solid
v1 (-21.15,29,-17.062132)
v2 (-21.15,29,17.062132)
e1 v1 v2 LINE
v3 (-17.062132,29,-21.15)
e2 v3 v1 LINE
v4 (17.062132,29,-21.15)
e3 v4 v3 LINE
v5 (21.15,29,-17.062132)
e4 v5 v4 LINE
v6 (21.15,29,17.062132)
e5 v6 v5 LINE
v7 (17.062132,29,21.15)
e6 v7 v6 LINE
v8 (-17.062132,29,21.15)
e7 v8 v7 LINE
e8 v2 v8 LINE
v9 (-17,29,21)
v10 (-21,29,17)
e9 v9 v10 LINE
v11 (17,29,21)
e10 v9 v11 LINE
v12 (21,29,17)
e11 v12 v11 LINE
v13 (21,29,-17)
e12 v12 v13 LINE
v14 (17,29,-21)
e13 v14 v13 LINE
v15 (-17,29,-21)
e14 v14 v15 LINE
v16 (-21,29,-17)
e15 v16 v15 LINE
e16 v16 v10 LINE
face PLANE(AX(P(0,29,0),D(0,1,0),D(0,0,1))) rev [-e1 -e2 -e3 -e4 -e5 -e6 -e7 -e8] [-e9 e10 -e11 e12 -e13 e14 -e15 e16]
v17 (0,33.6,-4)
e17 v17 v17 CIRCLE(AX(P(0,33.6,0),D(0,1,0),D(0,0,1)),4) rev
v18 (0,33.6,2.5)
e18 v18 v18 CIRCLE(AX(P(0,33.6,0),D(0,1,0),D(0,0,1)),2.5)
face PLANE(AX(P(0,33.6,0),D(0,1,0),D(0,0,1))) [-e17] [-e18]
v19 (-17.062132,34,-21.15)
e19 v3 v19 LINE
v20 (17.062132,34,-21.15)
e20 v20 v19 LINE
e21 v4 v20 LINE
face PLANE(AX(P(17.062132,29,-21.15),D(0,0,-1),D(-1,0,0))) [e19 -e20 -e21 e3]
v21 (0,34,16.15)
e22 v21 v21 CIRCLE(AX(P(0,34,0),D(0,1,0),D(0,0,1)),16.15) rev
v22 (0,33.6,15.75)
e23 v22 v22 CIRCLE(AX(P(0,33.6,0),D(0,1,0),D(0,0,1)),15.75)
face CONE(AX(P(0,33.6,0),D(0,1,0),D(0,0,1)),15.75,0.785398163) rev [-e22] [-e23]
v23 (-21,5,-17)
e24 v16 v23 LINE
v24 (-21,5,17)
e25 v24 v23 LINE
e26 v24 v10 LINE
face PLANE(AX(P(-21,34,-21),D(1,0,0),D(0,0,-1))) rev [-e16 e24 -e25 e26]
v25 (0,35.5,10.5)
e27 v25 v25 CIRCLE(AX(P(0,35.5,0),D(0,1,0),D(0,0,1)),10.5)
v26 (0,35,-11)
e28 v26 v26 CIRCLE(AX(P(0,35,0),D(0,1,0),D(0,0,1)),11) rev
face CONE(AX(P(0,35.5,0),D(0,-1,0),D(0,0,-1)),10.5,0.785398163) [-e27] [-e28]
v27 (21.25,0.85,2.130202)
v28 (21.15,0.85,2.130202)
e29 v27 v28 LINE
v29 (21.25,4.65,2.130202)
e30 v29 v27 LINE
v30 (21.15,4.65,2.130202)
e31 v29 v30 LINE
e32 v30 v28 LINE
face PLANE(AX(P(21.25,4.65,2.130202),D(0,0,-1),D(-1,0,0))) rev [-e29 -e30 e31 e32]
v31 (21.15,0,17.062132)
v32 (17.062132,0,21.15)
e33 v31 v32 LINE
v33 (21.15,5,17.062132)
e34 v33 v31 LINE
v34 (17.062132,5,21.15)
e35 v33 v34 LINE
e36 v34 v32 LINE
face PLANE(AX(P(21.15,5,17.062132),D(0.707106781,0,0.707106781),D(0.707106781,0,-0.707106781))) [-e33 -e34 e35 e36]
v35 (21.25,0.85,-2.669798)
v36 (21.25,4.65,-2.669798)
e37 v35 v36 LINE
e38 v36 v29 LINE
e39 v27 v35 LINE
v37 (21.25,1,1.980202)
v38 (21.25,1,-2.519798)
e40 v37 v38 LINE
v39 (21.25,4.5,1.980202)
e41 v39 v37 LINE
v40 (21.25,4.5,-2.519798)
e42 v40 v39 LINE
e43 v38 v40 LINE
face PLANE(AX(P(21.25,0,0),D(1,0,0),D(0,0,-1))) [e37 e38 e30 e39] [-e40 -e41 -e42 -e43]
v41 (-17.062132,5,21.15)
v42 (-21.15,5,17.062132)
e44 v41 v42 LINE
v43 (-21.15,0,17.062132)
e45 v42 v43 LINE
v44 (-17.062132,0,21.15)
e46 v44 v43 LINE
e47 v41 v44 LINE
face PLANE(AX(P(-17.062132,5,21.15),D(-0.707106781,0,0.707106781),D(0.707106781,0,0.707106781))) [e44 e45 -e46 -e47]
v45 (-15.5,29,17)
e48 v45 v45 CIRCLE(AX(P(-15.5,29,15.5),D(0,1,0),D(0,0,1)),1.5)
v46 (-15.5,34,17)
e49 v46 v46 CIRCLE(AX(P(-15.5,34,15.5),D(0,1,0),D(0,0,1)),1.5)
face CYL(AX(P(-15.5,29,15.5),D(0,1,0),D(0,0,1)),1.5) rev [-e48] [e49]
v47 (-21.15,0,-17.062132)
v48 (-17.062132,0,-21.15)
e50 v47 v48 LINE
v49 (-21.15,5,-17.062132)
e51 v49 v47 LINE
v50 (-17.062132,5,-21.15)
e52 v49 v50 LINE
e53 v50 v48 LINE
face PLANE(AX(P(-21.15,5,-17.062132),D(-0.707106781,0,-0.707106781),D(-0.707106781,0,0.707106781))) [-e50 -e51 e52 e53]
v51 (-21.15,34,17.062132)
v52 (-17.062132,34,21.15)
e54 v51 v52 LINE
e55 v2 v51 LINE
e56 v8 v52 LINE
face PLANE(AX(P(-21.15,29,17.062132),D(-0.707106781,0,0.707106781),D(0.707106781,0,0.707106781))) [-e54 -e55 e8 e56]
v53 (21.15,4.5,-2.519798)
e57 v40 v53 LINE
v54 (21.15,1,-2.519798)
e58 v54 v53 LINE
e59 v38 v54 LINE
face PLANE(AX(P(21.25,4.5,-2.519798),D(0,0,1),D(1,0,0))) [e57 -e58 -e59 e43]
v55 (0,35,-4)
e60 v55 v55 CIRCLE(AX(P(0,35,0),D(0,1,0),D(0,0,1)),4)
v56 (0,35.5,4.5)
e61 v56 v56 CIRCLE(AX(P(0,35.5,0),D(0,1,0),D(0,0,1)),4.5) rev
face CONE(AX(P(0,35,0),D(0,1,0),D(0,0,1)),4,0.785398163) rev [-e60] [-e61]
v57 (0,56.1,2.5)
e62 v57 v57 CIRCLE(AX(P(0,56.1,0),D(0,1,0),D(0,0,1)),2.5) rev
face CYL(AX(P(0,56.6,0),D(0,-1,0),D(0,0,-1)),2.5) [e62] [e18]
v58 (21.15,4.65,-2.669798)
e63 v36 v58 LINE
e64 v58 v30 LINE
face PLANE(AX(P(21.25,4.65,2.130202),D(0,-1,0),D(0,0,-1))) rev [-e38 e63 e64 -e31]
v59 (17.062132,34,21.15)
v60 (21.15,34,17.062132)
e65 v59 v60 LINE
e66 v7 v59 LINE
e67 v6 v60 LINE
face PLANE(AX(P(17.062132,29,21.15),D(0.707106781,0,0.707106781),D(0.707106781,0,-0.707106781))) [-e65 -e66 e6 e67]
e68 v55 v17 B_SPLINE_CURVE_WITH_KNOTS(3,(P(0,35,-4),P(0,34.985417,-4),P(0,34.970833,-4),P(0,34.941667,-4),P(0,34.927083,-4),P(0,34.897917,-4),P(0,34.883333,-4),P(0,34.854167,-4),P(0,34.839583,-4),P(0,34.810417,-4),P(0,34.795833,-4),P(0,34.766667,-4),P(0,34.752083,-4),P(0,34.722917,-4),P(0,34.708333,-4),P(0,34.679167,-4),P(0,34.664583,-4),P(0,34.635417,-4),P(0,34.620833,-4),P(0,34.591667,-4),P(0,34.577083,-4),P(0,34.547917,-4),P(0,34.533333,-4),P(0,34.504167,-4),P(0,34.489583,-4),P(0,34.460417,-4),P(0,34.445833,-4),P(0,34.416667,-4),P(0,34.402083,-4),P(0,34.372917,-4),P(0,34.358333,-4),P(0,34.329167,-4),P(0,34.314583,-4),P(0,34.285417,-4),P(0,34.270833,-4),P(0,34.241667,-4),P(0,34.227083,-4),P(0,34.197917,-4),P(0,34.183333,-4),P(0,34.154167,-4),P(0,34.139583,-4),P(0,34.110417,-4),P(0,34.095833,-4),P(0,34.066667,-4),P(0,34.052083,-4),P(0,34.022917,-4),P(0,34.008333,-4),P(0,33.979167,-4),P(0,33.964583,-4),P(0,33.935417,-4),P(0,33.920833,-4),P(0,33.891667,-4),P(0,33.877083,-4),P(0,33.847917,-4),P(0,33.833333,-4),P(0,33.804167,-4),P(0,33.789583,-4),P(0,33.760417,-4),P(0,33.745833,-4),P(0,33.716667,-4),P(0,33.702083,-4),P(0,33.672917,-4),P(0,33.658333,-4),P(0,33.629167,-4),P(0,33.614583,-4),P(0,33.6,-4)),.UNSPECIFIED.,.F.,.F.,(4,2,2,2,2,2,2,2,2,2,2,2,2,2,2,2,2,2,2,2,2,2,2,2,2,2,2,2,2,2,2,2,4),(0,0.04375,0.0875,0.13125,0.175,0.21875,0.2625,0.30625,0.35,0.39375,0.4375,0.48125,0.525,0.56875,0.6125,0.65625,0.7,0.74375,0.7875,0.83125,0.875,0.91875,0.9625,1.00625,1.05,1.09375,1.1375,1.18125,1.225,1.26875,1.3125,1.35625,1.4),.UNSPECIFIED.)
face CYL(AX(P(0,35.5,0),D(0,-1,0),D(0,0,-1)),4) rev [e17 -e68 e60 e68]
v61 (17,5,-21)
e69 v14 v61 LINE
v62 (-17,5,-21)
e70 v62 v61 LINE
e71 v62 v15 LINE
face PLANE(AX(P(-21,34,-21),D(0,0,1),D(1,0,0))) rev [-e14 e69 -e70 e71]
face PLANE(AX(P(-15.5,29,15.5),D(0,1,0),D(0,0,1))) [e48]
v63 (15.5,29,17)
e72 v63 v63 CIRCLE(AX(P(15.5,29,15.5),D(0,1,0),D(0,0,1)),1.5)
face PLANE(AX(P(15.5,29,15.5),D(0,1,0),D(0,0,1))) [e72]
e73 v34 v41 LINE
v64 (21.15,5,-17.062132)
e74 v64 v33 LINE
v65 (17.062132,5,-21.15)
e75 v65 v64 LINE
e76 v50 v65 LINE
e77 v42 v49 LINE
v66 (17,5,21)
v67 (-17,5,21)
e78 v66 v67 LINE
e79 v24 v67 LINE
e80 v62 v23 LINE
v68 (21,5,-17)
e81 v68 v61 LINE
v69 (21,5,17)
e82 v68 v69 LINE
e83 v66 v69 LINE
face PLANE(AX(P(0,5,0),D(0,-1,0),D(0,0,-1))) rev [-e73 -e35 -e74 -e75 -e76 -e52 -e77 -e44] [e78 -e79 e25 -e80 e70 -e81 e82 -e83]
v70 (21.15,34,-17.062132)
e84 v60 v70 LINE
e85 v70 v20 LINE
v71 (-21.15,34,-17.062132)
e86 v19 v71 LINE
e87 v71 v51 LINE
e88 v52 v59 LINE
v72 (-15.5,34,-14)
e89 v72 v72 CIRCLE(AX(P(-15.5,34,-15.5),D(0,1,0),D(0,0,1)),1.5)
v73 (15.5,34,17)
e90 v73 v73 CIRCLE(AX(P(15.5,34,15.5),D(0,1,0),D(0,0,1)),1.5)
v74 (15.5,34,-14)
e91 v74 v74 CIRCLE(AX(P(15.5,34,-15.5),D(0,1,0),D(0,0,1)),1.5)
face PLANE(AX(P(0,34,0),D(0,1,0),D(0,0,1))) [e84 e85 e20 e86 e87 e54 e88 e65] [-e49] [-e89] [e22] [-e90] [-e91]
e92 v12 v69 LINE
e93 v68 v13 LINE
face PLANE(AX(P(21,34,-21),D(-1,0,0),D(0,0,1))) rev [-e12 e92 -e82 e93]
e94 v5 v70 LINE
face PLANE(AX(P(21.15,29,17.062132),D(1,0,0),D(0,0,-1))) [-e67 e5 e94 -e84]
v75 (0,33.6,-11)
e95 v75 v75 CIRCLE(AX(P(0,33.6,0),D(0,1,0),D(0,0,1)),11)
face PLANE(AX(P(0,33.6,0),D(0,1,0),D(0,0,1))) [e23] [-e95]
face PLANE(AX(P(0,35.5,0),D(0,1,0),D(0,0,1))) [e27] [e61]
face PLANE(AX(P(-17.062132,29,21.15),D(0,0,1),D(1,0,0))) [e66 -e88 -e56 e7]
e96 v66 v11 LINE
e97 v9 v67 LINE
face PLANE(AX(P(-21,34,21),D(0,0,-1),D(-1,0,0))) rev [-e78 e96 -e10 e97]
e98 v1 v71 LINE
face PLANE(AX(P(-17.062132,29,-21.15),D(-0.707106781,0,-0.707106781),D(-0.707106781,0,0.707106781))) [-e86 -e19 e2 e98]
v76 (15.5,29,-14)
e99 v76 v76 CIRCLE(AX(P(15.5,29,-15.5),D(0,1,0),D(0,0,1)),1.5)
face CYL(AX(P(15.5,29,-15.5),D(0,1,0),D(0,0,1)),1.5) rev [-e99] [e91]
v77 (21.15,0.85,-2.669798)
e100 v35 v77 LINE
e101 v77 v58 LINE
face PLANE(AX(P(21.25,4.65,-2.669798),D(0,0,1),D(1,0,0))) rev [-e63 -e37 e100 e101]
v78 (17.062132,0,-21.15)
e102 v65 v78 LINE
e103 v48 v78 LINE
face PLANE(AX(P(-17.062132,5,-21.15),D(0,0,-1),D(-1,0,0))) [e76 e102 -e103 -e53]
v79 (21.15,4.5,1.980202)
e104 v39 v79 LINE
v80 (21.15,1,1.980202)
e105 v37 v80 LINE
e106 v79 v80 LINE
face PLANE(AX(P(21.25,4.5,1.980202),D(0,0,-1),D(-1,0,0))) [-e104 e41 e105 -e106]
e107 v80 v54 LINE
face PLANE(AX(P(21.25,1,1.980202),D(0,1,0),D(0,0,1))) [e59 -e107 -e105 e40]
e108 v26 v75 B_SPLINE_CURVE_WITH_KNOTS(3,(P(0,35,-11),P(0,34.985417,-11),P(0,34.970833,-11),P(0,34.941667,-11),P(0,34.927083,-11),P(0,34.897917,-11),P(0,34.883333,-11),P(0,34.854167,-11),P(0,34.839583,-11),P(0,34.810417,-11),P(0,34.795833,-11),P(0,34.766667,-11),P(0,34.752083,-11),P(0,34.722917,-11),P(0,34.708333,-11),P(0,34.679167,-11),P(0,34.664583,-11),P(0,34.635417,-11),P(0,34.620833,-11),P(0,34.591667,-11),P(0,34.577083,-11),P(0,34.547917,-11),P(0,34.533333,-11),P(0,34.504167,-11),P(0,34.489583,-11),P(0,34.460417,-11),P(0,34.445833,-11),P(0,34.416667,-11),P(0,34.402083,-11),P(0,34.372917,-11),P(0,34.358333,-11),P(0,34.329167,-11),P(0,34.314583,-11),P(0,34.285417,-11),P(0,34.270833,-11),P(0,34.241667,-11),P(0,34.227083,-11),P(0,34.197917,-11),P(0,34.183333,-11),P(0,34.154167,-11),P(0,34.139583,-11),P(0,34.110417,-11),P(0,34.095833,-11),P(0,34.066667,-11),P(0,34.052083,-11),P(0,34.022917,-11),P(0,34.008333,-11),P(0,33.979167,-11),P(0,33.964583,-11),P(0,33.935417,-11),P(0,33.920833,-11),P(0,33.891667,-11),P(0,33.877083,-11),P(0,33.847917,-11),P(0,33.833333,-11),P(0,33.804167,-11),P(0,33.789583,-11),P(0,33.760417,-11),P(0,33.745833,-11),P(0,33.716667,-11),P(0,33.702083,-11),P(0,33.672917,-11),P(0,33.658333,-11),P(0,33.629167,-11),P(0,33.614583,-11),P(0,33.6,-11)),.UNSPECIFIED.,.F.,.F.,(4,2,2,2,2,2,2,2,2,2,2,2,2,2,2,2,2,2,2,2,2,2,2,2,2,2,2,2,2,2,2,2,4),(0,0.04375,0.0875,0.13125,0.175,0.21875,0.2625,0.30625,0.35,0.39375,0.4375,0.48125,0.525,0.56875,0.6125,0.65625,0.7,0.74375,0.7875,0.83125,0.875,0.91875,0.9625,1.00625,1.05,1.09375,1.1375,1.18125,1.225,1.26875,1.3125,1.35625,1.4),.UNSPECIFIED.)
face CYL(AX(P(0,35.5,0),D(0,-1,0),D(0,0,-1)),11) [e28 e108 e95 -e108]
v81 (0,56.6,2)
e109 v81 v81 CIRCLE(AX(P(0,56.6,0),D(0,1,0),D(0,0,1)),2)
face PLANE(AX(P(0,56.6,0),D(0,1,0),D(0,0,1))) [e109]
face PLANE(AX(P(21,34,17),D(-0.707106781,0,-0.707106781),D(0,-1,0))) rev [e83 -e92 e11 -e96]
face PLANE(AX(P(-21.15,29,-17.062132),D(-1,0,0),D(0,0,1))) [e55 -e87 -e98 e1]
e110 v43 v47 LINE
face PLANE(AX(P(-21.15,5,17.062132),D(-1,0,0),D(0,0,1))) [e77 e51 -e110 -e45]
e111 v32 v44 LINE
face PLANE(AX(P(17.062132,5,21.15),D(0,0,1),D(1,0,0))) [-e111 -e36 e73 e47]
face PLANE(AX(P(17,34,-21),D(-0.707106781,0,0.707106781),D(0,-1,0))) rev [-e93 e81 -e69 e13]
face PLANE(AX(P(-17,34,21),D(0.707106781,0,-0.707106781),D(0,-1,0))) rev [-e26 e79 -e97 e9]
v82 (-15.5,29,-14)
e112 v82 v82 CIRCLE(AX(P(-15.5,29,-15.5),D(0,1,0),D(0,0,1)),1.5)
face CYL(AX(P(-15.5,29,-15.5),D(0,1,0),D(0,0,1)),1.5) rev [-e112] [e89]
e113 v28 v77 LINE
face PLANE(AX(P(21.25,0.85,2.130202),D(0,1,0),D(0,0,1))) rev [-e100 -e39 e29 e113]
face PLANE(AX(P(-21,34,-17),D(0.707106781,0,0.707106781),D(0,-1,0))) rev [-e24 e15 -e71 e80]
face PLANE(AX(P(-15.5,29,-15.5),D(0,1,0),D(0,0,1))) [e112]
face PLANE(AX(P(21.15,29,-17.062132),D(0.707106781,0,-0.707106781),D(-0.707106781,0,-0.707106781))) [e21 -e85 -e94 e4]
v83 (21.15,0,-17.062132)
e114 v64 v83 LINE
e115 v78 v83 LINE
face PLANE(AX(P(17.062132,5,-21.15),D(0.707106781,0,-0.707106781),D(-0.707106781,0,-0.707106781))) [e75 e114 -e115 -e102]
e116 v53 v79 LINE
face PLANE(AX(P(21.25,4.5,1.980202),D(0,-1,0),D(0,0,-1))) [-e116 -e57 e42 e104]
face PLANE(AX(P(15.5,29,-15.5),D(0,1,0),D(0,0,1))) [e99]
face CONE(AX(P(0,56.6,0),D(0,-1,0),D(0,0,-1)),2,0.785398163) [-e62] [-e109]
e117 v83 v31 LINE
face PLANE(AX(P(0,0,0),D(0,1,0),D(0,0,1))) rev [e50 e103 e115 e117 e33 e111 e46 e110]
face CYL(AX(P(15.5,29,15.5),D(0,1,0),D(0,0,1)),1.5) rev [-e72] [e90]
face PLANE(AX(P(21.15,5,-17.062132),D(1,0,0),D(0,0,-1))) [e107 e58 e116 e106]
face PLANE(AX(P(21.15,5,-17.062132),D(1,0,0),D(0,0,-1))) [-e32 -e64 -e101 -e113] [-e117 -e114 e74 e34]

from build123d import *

# Parameters (mm, degrees)
SKETCH1_W           = 42
SKETCH1_H           = 42
BOSS_EXTRUDE1_DEPTH = 34
CHAMFER1_SIZE       = 4
BOSS_EXTRUDE4_DEPTH = 5
BOSS_EXTRUDE5_DEPTH = 5
SKETCH2_R           = 16.25
CUT_EXTRUDE1_DEPTH  = 0.4
SKETCH3_R           = 11
SKETCH3_R_2         = 4
BOSS_EXTRUDE2_DEPTH = 1.9
SKETCH4_R           = 2.5
BOSS_EXTRUDE3_DEPTH = 23
CHAMFER2_SIZE       = 0.5
SKETCH5_R           = 1.5
CUT_EXTRUDE2_DEPTH  = 5
SKETCH8_W           = 4.8
SKETCH8_H           = 3.8
SKETCH8_W_2         = 4.5
SKETCH8_H_2         = 3.5
BOSS_EXTRUDE6_DEPTH = 0.1


with BuildPart() as part:
    # Sketch1 → Boss-Extrude1 (new body)
    with BuildSketch(Plane(origin=(0, 0, 0), x_dir=(1, 0, 0), z_dir=(0, 1, 0))):
        Rectangle(SKETCH1_W, SKETCH1_H)
    extrude(amount=BOSS_EXTRUDE1_DEPTH)

    # Chamfer1
    chamfer1_edges = [part.edges().sort_by_distance(p)[0] for p in [
        (21, 17, 21),
        (-21, 17, 21),
        (-21, 17, -21),
        (21, 17, -21),
    ]]
    chamfer(chamfer1_edges, length=CHAMFER1_SIZE)

    # Sketch6 → Boss-Extrude4 (add)
    with BuildSketch(Plane(origin=(0, 34, 0), x_dir=(1, 0, 0), z_dir=(0, 1, 0))):
        Polygon((17.062132034, 21.15), (-17.062132034, 21.15), (-21.15, 17.062132034), (-21.15, -17.062132034), (-17.062132034, -21.15), (17.062132034, -21.15), (21.15, -17.062132034), (21.15, 17.062132034), align=None)
    extrude(amount=-BOSS_EXTRUDE4_DEPTH)

    # Sketch7 → Boss-Extrude5 (add)
    with BuildSketch(Plane.XZ):
        Polygon((-21.15, 17.062132034), (-21.15, -17.062132034), (-17.062132034, -21.15), (17.062132034, -21.15), (21.15, -17.062132034), (21.15, 17.062132034), (17.062132034, 21.15), (-17.062132034, 21.15), align=None)
    extrude(amount=-BOSS_EXTRUDE5_DEPTH)

    # Sketch2 → Cut-Extrude1 (cut)
    with BuildSketch(Plane(origin=(0, 34, 0), x_dir=(1, 0, 0), z_dir=(0, 1, 0))):
        with Locations(Location((0, 0, 0), (0, 0, 270))):
            Circle(SKETCH2_R)
    extrude(amount=-CUT_EXTRUDE1_DEPTH, mode=Mode.SUBTRACT)

    # Sketch3 → Boss-Extrude2 (add)
    with BuildSketch(Plane(origin=(0, 33.6, 0), x_dir=(1, 0, 0), z_dir=(0, 1, 0))):
        with Locations(Location((0, 0, 0), (0, 0, 90))):
            Circle(SKETCH3_R)
        with Locations(Location((0, 0, 0), (0, 0, 90))):
            Circle(SKETCH3_R_2, mode=Mode.SUBTRACT)
    extrude(amount=BOSS_EXTRUDE2_DEPTH)

    # Sketch4 → Boss-Extrude3 (add)
    with BuildSketch(Plane(origin=(0, 33.6, 0), x_dir=(1, 0, 0), z_dir=(0, 1, 0))):
        with Locations(Location((0, 0, 0), (0, 0, 270))):
            Circle(SKETCH4_R)
    extrude(amount=BOSS_EXTRUDE3_DEPTH)

    # Chamfer2
    # the kernel refuses this chamfer: 0.5 mm, written as the material it adds along each edge
    with BuildSketch(Plane(origin=(0, 33.6, 0), x_dir=(0, 0, 1), z_dir=(-1, 0, 0))) as chamfer2_piece_1_section:
        Polygon((16.25, CHAMFER2_SIZE), (16.25 - CHAMFER2_SIZE, 0), (16.25, 0), align=None)
    chamfer2_piece_1 = revolve(axis=Axis((0, 33.6, 0), (0, 1, 0)), mode=Mode.PRIVATE)
    chamfer2_piece_1 = split(chamfer2_piece_1, bisect_by=Plane(origin=(0, 34, -15.959627936), z_dir=(0, -1, 0)), keep=Keep.TOP, mode=Mode.PRIVATE)
    add(chamfer2_piece_1)
    # the kernel refuses this chamfer: 0.5 mm, written as the material it takes off along each edge
    with BuildSketch(Plane(origin=(0, 35.5, 0), x_dir=(0, 0, -1), z_dir=(1, 0, 0))) as chamfer2_2_piece_1:
        Polygon((4 + CHAMFER2_SIZE, 0), (4, -CHAMFER2_SIZE), (4, 0), align=None)
    revolve(axis=Axis((0, 35.5, 0), (0, 1, 0)), mode=Mode.SUBTRACT)
    with BuildSketch(Plane(origin=(0, 35.5, 0), x_dir=(0, 0, -1), z_dir=(1, 0, 0))) as chamfer2_2_piece_2:
        Polygon((11, -CHAMFER2_SIZE), (11 - CHAMFER2_SIZE, 0), (11, 0), align=None)
    revolve(axis=Axis((0, 35.5, 0), (0, 1, 0)), mode=Mode.SUBTRACT)
    with BuildSketch(Plane(origin=(0, 56.6, 0), x_dir=(0, 0, 1), z_dir=(-1, 0, 0))) as chamfer2_2_piece_3:
        Polygon((2.5, -CHAMFER2_SIZE), (2.5 - CHAMFER2_SIZE, 0), (2.5, 0), align=None)
    revolve(axis=Axis((0, 56.6, 0), (0, 1, 0)), mode=Mode.SUBTRACT)

    # Sketch5 → Cut-Extrude2 (cut)
    with BuildSketch(Plane(origin=(0, 34, 0), x_dir=(1, 0, 0), z_dir=(0, 1, 0))):
        with Locations(Location((-15.5, 15.5, 0), (0, 0, 270))):
            Circle(SKETCH5_R)
        with Locations(Location((15.5, 15.5, 0), (0, 0, 270))):
            Circle(SKETCH5_R)
        with Locations(Location((15.5, -15.5, 0), (0, 0, 270))):
            Circle(SKETCH5_R)
        with Locations(Location((-15.5, -15.5, 0), (0, 0, 270))):
            Circle(SKETCH5_R)
    extrude(amount=-CUT_EXTRUDE2_DEPTH, mode=Mode.SUBTRACT)

    # Sketch8 → Boss-Extrude6 (add)
    with BuildSketch(Plane(origin=(21.15, 0, 0), x_dir=(0, 0, -1), z_dir=(1, 0, 0))):
        with Locations((0.269797982, 2.75)):
            Rectangle(SKETCH8_W, SKETCH8_H)
        with Locations((0.269797982, 2.75)):
            Rectangle(SKETCH8_W_2, SKETCH8_H_2, mode=Mode.SUBTRACT)
    extrude(amount=BOSS_EXTRUDE6_DEPTH)


solid = part.part
